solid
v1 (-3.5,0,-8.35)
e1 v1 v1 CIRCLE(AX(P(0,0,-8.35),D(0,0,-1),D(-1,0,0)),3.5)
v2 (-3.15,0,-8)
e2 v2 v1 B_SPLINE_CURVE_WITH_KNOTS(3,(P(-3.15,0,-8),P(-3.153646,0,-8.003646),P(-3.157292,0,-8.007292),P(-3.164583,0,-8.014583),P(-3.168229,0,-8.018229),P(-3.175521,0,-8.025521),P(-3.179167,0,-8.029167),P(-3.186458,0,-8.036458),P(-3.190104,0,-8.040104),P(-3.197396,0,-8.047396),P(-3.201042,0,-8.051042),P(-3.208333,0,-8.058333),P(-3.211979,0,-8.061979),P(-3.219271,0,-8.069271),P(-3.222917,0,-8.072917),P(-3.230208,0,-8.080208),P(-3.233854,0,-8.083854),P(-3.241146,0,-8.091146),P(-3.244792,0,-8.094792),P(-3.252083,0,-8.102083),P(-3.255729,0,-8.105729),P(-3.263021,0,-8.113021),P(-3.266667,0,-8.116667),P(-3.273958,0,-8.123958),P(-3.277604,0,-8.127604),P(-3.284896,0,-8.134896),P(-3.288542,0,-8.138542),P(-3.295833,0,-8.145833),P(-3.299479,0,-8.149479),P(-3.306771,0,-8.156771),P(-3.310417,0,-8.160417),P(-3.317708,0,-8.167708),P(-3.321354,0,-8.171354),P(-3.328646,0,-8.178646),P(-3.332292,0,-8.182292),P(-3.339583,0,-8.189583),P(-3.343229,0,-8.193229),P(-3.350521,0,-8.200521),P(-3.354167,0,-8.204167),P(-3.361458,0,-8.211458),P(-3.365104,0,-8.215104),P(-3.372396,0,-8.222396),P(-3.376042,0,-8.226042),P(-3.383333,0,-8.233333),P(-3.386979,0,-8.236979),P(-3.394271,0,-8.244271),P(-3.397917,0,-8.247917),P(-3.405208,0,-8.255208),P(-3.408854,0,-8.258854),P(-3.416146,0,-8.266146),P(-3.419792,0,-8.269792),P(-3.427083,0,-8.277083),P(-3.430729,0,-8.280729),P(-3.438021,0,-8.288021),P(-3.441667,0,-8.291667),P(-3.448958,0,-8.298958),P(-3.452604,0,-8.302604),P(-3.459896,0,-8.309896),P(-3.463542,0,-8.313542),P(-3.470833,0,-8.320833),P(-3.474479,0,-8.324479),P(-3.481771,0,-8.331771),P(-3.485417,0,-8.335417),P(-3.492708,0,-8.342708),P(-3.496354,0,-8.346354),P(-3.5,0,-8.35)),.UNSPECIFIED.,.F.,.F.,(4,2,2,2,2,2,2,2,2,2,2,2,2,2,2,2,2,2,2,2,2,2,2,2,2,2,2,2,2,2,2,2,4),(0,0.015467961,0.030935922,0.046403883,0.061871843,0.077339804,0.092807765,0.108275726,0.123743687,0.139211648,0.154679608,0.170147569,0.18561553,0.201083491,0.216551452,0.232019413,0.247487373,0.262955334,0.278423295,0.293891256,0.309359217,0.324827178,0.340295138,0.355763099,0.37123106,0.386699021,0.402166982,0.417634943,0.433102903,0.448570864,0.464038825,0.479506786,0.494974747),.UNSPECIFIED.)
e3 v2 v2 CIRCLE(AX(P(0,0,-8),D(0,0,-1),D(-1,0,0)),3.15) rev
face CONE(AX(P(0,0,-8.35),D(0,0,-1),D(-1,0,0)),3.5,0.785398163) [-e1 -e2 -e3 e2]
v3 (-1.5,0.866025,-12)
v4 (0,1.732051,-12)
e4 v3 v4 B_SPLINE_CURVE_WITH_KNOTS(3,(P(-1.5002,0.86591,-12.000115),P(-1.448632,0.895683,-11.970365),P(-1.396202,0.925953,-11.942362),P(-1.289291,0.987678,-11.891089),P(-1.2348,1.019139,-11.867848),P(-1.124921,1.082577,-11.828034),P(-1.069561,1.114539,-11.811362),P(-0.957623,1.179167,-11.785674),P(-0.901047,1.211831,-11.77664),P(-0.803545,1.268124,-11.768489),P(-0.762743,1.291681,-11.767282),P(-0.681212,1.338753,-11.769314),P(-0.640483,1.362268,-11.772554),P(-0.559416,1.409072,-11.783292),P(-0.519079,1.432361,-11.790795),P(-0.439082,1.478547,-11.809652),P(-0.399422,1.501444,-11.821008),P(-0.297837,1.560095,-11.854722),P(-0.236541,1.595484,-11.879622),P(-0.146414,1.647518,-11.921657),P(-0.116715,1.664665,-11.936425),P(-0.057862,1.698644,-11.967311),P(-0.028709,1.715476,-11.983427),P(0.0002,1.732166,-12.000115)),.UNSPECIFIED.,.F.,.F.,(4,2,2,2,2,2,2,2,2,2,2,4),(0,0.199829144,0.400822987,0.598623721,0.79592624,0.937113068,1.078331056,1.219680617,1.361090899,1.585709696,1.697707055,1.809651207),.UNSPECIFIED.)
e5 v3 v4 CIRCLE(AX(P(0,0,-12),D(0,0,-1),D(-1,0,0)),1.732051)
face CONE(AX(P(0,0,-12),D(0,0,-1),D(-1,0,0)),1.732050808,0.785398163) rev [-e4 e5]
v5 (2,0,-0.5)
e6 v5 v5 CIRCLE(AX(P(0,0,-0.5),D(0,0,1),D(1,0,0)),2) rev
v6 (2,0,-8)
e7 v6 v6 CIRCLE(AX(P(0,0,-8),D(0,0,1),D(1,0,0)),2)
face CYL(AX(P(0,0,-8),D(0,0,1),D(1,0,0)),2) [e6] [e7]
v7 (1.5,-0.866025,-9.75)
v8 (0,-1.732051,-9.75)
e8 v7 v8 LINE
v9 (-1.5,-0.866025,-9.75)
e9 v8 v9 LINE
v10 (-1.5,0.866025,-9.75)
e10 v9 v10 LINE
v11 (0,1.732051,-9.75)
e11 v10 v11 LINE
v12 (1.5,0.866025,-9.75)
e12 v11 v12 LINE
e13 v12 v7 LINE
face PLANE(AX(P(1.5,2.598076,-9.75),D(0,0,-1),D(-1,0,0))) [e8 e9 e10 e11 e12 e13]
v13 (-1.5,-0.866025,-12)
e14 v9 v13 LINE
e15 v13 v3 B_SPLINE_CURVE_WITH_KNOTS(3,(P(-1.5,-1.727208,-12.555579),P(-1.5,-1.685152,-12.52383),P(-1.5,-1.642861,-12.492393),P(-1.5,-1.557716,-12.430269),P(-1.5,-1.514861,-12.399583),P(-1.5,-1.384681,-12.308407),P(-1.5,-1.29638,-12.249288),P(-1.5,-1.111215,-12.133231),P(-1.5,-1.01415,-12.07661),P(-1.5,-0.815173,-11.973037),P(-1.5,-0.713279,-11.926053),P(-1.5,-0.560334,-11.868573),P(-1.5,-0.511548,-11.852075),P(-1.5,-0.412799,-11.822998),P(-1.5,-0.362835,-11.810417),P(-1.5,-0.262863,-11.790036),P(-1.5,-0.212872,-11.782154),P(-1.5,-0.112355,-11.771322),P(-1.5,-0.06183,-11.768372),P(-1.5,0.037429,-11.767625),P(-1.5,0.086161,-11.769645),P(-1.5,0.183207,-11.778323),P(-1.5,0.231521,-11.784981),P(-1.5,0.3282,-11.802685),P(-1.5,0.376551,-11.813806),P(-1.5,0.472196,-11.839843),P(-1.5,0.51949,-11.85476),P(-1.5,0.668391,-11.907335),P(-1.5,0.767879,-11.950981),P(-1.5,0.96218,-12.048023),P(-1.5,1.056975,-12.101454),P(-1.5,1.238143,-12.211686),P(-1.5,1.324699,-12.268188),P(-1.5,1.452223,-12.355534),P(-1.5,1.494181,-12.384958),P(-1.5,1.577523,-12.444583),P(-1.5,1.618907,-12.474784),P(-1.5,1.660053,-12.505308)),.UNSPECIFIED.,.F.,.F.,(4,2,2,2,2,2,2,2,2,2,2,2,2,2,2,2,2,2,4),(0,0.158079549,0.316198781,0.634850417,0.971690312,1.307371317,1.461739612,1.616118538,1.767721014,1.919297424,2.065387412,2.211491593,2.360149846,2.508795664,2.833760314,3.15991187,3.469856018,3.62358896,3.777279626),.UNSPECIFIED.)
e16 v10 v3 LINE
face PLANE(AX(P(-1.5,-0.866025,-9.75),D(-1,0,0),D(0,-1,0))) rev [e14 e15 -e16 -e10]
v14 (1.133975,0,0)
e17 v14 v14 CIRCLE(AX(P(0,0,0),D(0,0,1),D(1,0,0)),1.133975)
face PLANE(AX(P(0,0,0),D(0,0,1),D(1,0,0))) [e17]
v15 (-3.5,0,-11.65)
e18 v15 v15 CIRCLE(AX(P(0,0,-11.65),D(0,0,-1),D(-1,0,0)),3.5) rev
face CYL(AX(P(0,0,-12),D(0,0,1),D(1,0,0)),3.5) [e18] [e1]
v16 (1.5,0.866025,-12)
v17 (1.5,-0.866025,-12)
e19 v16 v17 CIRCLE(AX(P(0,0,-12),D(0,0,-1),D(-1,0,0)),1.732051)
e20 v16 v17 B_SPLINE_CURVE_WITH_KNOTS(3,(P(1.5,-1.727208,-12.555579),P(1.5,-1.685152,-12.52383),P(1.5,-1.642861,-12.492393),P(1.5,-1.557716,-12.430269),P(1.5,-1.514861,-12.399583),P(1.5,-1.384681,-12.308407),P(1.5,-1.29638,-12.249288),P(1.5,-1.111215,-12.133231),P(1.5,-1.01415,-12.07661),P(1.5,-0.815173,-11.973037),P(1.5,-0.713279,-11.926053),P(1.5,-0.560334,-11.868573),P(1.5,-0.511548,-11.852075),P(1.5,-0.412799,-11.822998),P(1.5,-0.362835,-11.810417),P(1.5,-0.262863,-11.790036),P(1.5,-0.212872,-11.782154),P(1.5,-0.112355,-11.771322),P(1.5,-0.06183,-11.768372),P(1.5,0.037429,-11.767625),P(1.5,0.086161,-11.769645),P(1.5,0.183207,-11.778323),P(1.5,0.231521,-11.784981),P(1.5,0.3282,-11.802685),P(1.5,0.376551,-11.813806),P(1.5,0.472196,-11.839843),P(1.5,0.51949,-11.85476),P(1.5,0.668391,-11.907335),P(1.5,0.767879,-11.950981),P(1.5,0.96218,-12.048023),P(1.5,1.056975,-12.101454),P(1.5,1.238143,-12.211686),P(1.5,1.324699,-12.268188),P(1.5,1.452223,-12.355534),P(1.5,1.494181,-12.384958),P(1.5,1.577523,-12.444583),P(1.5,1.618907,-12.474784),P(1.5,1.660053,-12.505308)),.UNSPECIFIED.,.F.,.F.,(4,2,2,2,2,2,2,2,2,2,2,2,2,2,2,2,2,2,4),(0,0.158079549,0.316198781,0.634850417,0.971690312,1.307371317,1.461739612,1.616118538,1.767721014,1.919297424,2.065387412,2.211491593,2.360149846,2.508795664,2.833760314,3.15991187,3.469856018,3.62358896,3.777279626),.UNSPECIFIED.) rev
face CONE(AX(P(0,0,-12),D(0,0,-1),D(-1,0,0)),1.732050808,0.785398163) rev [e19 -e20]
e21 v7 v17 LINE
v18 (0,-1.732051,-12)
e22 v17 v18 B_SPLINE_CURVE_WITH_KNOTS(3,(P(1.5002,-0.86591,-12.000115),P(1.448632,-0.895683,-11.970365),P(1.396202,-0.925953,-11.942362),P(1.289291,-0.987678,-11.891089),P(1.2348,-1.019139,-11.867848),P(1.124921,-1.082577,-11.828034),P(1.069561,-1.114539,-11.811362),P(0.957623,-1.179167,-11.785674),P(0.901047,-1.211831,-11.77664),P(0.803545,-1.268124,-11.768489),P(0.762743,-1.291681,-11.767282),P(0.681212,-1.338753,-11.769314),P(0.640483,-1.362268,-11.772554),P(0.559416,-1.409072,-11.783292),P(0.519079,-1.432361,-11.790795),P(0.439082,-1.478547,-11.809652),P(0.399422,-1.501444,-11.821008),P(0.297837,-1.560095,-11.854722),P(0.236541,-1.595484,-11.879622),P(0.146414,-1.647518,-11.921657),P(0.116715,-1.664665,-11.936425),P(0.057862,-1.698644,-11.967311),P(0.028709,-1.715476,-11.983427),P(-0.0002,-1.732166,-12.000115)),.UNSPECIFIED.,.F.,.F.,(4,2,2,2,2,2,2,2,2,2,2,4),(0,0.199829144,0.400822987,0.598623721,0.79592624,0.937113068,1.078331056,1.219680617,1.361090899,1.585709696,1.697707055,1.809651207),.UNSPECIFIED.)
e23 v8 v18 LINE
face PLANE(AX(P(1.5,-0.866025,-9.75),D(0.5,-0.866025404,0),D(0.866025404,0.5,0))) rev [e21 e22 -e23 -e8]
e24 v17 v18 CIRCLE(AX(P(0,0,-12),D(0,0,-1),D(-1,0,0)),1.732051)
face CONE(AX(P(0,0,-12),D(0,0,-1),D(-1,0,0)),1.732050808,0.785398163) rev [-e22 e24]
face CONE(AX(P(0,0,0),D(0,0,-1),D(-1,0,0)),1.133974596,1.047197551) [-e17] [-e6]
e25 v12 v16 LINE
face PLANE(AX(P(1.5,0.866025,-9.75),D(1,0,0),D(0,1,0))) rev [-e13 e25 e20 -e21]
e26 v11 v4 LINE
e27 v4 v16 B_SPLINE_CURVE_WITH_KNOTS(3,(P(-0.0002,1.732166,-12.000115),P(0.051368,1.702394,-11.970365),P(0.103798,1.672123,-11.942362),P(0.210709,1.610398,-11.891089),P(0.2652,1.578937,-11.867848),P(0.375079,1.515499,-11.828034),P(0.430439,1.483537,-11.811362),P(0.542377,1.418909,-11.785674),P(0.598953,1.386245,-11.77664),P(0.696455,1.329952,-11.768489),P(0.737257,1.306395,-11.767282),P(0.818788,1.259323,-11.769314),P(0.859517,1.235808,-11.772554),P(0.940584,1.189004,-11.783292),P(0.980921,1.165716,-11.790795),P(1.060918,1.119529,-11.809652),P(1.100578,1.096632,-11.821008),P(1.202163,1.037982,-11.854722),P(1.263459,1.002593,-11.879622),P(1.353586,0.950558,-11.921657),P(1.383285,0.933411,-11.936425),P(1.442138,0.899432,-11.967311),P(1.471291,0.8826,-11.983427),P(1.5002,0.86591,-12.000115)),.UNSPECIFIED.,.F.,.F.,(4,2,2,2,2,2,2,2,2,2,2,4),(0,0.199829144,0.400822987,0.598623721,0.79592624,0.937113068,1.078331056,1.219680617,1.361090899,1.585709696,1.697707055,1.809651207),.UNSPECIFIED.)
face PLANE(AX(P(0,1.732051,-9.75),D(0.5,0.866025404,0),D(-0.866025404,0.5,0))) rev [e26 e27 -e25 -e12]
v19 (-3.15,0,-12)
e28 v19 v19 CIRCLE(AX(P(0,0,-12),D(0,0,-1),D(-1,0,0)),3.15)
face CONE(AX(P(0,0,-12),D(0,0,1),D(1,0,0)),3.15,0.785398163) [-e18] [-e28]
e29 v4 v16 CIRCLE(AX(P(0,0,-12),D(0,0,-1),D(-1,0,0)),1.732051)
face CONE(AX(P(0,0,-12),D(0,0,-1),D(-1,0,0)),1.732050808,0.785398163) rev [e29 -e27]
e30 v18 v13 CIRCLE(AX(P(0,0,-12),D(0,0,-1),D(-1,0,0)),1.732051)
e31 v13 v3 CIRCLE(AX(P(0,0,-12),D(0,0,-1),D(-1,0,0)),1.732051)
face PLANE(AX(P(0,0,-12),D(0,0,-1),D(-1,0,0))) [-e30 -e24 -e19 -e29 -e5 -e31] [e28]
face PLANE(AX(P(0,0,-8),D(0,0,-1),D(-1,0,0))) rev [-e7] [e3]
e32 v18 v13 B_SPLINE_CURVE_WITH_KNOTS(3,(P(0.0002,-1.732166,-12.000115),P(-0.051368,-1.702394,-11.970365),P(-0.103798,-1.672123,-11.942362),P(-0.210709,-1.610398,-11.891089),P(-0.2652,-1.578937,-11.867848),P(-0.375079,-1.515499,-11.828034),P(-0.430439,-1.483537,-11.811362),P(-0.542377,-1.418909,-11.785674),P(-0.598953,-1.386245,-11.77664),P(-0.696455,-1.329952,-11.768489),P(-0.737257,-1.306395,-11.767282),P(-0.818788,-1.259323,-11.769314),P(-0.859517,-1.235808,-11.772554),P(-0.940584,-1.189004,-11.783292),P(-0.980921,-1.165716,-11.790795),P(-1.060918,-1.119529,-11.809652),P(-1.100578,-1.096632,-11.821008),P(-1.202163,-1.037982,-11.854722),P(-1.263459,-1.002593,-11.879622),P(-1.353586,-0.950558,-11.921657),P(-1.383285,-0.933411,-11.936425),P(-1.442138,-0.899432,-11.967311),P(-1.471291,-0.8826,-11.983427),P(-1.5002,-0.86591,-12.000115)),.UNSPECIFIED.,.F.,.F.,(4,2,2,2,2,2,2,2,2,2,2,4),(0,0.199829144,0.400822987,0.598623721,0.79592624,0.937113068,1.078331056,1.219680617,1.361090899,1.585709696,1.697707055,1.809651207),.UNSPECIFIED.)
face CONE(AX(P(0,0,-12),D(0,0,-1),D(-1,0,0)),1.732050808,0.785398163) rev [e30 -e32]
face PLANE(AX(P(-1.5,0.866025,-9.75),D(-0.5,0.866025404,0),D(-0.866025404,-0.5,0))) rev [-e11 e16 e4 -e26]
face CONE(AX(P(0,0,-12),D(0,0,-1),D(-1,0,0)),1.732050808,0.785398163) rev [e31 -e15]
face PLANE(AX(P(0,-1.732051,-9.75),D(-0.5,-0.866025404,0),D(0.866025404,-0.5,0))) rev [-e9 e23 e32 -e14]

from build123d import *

# Parameters (mm, degrees)
SKETCH1_R           = 2
EXTRUDE1_DEPTH      = 8
CUT_SWEEP1_PITCH    = 0.7
SKETCH6_R           = 3.5
EXTRUDE2_DEPTH      = 4
CUT_EXTRUDE1_DEPTH  = 2.25
CHAMFER1_SIZE       = 0.35
SKETCH10_R          = 2
BOSS_EXTRUDE1_DEPTH = 8
CHAMFER2_SIZE       = 0.5
CHAMFER2_SIZE2      = 0.866025404


with BuildPart() as part:
    # Sketch1 → Extrude1 (new body)
    with BuildSketch(Plane.XY):
        Circle(SKETCH1_R)
    extrude(amount=-EXTRUDE1_DEPTH)

    # Cut-Sweep1: the profile of Sketch3 profile screwed along a right-hand helix of 12.428571 turns, 6 arcs to a turn; built about Z, then put on its axis
    cut_sweep1_z = Axis((0, 0, 0), (0, 0, 1))
    cut_sweep1_corners = [(2.0003, 0, -0.612673205), (1.545336663, 0, -0.35), (1.545336663, 0, -0.2625), (2.0003, 0, 0.000173205)]
    with BuildLine(mode=Mode.PRIVATE) as cut_sweep1_profile:
        Line(cut_sweep1_corners[0], cut_sweep1_corners[1])
        Line(cut_sweep1_corners[1], cut_sweep1_corners[2])
        Line(cut_sweep1_corners[2], cut_sweep1_corners[3])
        Line(cut_sweep1_corners[3], cut_sweep1_corners[0])
    cut_sweep1_cap = Face(cut_sweep1_profile.wire())
    cut_sweep1_turn_angles = [0, 30, 60, 90, 120, 150, 180, 210, 240, 270, 300, 330, 360]
    cut_sweep1_turn_weights = [1, 0.8660254037844387, 1, 0.8660254037844387, 1, 0.8660254037844387, 1, 0.8660254037844387, 1, 0.8660254037844387, 1, 0.8660254037844387, 1]
    cut_sweep1_turn_rails = [Edge.make_bspline([Vector(p[0], p[1], 0).rotate(cut_sweep1_z, cut_sweep1_turn_angles[k]) / cut_sweep1_turn_weights[k] + Vector(0, 0, p[2] + CUT_SWEEP1_PITCH * cut_sweep1_turn_angles[k] / 360) for k in range(13)], [0, 0, 0, 1, 1, 2, 2, 3, 3, 4, 4, 5, 5, 6, 6, 6], 2, cut_sweep1_turn_weights) for p in cut_sweep1_corners]
    cut_sweep1_turn_sides = [Face.make_surface_from_curves(cut_sweep1_turn_rails[p[0]], cut_sweep1_turn_rails[p[1]]) for p in [(0, 1), (1, 2), (2, 3), (3, 0)]]
    cut_sweep1_last_angles = [4320, 4350, 4380, 4410, 4440, 4457.142857143, 4474.285714286]
    cut_sweep1_last_weights = [1, 0.8660254037844387, 1, 0.8660254037844387, 1, 0.9555728057861561, 1]
    cut_sweep1_last_rails = [Edge.make_bspline([Vector(p[0], p[1], 0).rotate(cut_sweep1_z, cut_sweep1_last_angles[k]) / cut_sweep1_last_weights[k] + Vector(0, 0, p[2] + CUT_SWEEP1_PITCH * cut_sweep1_last_angles[k] / 360) for k in range(7)], [0, 0, 0, 1, 1, 2, 2, 3, 3, 3], 2, cut_sweep1_last_weights) for p in cut_sweep1_corners]
    cut_sweep1_last_sides = [Face.make_surface_from_curves(cut_sweep1_last_rails[p[0]], cut_sweep1_last_rails[p[1]]) for p in [(0, 1), (1, 2), (2, 3), (3, 0)]]
    cut_sweep1 = Plane(origin=(0, 0, 0), x_dir=(0, 1, 0), z_dir=(0, 0, -1)) * Solid(Shell([*[p.moved(Location((0, 0, CUT_SWEEP1_PITCH * i))) for i in range(12) for p in cut_sweep1_turn_sides], *cut_sweep1_last_sides, cut_sweep1_cap, cut_sweep1_cap.rotate(cut_sweep1_z, 4474.285714286).moved(Location((0, 0, CUT_SWEEP1_PITCH * 4474.285714286 / 360)))]))
    add(cut_sweep1, mode=Mode.SUBTRACT)

    # Sketch4 → Cut-Revolve1 (revolve, cut)
    with BuildSketch(Plane(origin=(0, 0, 0), x_dir=(0, 0, -1), z_dir=(1, 0, 0)), mode=Mode.PRIVATE) as cut_revolve1_sk:
        Polygon((0.496211411, 2), (0, 1.291336663), (0, 2), align=None)
    revolve(cut_revolve1_sk.sketch.rotate(Axis((0, 0, 0), (0, 0, -1)), 271.401126896), axis=Axis((0, 0, 0), (0, 0, -1)), mode=Mode.SUBTRACT)

    # Sketch6 → Extrude2 (add)
    with BuildSketch(Plane(origin=(0, 0, -8), x_dir=(-1, 0, 0), z_dir=(0, 0, -1))):
        Circle(SKETCH6_R)
    extrude(amount=EXTRUDE2_DEPTH)

    # Sketch7 → Cut-Extrude1 (cut)
    with BuildSketch(Plane(origin=(0, 0, -12), x_dir=(-1, 0, 0), z_dir=(0, 0, -1))):
        Polygon((0, 1.732050808), (-1.5, 0.866025404), (-1.5, -0.866025404), (0, -1.732050808), (1.5, -0.866025404), (1.5, 0.866025404), align=None)
    extrude(amount=-CUT_EXTRUDE1_DEPTH, mode=Mode.SUBTRACT)

    # Cut-Extrude2 cone 1 section (through the dimple's axis) → Cut-Extrude2 (revolve, cut)
    with BuildSketch(Plane(origin=(0, 0, -12), x_dir=(0, 1, 0), z_dir=(1, 0, 0))):
        Polygon((0, 0), (1.732050808, 0), (0, 1.732050808), align=None)
    revolve(axis=Axis((0, 0, -12), (0, 0, 1)), mode=Mode.SUBTRACT)

    # Chamfer1
    chamfer1_edges = [part.edges().sort_by_distance(p)[0] for p in [
        (3.5, 0, -8),
        (3.5, 0, -12),
    ]]
    chamfer(chamfer1_edges, length=CHAMFER1_SIZE)

    # Sketch10 → Boss-Extrude1 (add)
    with BuildSketch(Plane.XY):
        Circle(SKETCH10_R)
    extrude(amount=-BOSS_EXTRUDE1_DEPTH)

    # Chamfer2
    chamfer2_edges = [part.edges().sort_by_distance(p)[0] for p in [
        (-2, 0, 0),
    ]]
    chamfer2_side = [part.faces().sort_by_distance(p)[0] for p in [
        (-2, 0, -4),
    ]]
    chamfer(chamfer2_edges, length=CHAMFER2_SIZE, length2=CHAMFER2_SIZE2, reference=chamfer2_side[0])


solid = part.part
